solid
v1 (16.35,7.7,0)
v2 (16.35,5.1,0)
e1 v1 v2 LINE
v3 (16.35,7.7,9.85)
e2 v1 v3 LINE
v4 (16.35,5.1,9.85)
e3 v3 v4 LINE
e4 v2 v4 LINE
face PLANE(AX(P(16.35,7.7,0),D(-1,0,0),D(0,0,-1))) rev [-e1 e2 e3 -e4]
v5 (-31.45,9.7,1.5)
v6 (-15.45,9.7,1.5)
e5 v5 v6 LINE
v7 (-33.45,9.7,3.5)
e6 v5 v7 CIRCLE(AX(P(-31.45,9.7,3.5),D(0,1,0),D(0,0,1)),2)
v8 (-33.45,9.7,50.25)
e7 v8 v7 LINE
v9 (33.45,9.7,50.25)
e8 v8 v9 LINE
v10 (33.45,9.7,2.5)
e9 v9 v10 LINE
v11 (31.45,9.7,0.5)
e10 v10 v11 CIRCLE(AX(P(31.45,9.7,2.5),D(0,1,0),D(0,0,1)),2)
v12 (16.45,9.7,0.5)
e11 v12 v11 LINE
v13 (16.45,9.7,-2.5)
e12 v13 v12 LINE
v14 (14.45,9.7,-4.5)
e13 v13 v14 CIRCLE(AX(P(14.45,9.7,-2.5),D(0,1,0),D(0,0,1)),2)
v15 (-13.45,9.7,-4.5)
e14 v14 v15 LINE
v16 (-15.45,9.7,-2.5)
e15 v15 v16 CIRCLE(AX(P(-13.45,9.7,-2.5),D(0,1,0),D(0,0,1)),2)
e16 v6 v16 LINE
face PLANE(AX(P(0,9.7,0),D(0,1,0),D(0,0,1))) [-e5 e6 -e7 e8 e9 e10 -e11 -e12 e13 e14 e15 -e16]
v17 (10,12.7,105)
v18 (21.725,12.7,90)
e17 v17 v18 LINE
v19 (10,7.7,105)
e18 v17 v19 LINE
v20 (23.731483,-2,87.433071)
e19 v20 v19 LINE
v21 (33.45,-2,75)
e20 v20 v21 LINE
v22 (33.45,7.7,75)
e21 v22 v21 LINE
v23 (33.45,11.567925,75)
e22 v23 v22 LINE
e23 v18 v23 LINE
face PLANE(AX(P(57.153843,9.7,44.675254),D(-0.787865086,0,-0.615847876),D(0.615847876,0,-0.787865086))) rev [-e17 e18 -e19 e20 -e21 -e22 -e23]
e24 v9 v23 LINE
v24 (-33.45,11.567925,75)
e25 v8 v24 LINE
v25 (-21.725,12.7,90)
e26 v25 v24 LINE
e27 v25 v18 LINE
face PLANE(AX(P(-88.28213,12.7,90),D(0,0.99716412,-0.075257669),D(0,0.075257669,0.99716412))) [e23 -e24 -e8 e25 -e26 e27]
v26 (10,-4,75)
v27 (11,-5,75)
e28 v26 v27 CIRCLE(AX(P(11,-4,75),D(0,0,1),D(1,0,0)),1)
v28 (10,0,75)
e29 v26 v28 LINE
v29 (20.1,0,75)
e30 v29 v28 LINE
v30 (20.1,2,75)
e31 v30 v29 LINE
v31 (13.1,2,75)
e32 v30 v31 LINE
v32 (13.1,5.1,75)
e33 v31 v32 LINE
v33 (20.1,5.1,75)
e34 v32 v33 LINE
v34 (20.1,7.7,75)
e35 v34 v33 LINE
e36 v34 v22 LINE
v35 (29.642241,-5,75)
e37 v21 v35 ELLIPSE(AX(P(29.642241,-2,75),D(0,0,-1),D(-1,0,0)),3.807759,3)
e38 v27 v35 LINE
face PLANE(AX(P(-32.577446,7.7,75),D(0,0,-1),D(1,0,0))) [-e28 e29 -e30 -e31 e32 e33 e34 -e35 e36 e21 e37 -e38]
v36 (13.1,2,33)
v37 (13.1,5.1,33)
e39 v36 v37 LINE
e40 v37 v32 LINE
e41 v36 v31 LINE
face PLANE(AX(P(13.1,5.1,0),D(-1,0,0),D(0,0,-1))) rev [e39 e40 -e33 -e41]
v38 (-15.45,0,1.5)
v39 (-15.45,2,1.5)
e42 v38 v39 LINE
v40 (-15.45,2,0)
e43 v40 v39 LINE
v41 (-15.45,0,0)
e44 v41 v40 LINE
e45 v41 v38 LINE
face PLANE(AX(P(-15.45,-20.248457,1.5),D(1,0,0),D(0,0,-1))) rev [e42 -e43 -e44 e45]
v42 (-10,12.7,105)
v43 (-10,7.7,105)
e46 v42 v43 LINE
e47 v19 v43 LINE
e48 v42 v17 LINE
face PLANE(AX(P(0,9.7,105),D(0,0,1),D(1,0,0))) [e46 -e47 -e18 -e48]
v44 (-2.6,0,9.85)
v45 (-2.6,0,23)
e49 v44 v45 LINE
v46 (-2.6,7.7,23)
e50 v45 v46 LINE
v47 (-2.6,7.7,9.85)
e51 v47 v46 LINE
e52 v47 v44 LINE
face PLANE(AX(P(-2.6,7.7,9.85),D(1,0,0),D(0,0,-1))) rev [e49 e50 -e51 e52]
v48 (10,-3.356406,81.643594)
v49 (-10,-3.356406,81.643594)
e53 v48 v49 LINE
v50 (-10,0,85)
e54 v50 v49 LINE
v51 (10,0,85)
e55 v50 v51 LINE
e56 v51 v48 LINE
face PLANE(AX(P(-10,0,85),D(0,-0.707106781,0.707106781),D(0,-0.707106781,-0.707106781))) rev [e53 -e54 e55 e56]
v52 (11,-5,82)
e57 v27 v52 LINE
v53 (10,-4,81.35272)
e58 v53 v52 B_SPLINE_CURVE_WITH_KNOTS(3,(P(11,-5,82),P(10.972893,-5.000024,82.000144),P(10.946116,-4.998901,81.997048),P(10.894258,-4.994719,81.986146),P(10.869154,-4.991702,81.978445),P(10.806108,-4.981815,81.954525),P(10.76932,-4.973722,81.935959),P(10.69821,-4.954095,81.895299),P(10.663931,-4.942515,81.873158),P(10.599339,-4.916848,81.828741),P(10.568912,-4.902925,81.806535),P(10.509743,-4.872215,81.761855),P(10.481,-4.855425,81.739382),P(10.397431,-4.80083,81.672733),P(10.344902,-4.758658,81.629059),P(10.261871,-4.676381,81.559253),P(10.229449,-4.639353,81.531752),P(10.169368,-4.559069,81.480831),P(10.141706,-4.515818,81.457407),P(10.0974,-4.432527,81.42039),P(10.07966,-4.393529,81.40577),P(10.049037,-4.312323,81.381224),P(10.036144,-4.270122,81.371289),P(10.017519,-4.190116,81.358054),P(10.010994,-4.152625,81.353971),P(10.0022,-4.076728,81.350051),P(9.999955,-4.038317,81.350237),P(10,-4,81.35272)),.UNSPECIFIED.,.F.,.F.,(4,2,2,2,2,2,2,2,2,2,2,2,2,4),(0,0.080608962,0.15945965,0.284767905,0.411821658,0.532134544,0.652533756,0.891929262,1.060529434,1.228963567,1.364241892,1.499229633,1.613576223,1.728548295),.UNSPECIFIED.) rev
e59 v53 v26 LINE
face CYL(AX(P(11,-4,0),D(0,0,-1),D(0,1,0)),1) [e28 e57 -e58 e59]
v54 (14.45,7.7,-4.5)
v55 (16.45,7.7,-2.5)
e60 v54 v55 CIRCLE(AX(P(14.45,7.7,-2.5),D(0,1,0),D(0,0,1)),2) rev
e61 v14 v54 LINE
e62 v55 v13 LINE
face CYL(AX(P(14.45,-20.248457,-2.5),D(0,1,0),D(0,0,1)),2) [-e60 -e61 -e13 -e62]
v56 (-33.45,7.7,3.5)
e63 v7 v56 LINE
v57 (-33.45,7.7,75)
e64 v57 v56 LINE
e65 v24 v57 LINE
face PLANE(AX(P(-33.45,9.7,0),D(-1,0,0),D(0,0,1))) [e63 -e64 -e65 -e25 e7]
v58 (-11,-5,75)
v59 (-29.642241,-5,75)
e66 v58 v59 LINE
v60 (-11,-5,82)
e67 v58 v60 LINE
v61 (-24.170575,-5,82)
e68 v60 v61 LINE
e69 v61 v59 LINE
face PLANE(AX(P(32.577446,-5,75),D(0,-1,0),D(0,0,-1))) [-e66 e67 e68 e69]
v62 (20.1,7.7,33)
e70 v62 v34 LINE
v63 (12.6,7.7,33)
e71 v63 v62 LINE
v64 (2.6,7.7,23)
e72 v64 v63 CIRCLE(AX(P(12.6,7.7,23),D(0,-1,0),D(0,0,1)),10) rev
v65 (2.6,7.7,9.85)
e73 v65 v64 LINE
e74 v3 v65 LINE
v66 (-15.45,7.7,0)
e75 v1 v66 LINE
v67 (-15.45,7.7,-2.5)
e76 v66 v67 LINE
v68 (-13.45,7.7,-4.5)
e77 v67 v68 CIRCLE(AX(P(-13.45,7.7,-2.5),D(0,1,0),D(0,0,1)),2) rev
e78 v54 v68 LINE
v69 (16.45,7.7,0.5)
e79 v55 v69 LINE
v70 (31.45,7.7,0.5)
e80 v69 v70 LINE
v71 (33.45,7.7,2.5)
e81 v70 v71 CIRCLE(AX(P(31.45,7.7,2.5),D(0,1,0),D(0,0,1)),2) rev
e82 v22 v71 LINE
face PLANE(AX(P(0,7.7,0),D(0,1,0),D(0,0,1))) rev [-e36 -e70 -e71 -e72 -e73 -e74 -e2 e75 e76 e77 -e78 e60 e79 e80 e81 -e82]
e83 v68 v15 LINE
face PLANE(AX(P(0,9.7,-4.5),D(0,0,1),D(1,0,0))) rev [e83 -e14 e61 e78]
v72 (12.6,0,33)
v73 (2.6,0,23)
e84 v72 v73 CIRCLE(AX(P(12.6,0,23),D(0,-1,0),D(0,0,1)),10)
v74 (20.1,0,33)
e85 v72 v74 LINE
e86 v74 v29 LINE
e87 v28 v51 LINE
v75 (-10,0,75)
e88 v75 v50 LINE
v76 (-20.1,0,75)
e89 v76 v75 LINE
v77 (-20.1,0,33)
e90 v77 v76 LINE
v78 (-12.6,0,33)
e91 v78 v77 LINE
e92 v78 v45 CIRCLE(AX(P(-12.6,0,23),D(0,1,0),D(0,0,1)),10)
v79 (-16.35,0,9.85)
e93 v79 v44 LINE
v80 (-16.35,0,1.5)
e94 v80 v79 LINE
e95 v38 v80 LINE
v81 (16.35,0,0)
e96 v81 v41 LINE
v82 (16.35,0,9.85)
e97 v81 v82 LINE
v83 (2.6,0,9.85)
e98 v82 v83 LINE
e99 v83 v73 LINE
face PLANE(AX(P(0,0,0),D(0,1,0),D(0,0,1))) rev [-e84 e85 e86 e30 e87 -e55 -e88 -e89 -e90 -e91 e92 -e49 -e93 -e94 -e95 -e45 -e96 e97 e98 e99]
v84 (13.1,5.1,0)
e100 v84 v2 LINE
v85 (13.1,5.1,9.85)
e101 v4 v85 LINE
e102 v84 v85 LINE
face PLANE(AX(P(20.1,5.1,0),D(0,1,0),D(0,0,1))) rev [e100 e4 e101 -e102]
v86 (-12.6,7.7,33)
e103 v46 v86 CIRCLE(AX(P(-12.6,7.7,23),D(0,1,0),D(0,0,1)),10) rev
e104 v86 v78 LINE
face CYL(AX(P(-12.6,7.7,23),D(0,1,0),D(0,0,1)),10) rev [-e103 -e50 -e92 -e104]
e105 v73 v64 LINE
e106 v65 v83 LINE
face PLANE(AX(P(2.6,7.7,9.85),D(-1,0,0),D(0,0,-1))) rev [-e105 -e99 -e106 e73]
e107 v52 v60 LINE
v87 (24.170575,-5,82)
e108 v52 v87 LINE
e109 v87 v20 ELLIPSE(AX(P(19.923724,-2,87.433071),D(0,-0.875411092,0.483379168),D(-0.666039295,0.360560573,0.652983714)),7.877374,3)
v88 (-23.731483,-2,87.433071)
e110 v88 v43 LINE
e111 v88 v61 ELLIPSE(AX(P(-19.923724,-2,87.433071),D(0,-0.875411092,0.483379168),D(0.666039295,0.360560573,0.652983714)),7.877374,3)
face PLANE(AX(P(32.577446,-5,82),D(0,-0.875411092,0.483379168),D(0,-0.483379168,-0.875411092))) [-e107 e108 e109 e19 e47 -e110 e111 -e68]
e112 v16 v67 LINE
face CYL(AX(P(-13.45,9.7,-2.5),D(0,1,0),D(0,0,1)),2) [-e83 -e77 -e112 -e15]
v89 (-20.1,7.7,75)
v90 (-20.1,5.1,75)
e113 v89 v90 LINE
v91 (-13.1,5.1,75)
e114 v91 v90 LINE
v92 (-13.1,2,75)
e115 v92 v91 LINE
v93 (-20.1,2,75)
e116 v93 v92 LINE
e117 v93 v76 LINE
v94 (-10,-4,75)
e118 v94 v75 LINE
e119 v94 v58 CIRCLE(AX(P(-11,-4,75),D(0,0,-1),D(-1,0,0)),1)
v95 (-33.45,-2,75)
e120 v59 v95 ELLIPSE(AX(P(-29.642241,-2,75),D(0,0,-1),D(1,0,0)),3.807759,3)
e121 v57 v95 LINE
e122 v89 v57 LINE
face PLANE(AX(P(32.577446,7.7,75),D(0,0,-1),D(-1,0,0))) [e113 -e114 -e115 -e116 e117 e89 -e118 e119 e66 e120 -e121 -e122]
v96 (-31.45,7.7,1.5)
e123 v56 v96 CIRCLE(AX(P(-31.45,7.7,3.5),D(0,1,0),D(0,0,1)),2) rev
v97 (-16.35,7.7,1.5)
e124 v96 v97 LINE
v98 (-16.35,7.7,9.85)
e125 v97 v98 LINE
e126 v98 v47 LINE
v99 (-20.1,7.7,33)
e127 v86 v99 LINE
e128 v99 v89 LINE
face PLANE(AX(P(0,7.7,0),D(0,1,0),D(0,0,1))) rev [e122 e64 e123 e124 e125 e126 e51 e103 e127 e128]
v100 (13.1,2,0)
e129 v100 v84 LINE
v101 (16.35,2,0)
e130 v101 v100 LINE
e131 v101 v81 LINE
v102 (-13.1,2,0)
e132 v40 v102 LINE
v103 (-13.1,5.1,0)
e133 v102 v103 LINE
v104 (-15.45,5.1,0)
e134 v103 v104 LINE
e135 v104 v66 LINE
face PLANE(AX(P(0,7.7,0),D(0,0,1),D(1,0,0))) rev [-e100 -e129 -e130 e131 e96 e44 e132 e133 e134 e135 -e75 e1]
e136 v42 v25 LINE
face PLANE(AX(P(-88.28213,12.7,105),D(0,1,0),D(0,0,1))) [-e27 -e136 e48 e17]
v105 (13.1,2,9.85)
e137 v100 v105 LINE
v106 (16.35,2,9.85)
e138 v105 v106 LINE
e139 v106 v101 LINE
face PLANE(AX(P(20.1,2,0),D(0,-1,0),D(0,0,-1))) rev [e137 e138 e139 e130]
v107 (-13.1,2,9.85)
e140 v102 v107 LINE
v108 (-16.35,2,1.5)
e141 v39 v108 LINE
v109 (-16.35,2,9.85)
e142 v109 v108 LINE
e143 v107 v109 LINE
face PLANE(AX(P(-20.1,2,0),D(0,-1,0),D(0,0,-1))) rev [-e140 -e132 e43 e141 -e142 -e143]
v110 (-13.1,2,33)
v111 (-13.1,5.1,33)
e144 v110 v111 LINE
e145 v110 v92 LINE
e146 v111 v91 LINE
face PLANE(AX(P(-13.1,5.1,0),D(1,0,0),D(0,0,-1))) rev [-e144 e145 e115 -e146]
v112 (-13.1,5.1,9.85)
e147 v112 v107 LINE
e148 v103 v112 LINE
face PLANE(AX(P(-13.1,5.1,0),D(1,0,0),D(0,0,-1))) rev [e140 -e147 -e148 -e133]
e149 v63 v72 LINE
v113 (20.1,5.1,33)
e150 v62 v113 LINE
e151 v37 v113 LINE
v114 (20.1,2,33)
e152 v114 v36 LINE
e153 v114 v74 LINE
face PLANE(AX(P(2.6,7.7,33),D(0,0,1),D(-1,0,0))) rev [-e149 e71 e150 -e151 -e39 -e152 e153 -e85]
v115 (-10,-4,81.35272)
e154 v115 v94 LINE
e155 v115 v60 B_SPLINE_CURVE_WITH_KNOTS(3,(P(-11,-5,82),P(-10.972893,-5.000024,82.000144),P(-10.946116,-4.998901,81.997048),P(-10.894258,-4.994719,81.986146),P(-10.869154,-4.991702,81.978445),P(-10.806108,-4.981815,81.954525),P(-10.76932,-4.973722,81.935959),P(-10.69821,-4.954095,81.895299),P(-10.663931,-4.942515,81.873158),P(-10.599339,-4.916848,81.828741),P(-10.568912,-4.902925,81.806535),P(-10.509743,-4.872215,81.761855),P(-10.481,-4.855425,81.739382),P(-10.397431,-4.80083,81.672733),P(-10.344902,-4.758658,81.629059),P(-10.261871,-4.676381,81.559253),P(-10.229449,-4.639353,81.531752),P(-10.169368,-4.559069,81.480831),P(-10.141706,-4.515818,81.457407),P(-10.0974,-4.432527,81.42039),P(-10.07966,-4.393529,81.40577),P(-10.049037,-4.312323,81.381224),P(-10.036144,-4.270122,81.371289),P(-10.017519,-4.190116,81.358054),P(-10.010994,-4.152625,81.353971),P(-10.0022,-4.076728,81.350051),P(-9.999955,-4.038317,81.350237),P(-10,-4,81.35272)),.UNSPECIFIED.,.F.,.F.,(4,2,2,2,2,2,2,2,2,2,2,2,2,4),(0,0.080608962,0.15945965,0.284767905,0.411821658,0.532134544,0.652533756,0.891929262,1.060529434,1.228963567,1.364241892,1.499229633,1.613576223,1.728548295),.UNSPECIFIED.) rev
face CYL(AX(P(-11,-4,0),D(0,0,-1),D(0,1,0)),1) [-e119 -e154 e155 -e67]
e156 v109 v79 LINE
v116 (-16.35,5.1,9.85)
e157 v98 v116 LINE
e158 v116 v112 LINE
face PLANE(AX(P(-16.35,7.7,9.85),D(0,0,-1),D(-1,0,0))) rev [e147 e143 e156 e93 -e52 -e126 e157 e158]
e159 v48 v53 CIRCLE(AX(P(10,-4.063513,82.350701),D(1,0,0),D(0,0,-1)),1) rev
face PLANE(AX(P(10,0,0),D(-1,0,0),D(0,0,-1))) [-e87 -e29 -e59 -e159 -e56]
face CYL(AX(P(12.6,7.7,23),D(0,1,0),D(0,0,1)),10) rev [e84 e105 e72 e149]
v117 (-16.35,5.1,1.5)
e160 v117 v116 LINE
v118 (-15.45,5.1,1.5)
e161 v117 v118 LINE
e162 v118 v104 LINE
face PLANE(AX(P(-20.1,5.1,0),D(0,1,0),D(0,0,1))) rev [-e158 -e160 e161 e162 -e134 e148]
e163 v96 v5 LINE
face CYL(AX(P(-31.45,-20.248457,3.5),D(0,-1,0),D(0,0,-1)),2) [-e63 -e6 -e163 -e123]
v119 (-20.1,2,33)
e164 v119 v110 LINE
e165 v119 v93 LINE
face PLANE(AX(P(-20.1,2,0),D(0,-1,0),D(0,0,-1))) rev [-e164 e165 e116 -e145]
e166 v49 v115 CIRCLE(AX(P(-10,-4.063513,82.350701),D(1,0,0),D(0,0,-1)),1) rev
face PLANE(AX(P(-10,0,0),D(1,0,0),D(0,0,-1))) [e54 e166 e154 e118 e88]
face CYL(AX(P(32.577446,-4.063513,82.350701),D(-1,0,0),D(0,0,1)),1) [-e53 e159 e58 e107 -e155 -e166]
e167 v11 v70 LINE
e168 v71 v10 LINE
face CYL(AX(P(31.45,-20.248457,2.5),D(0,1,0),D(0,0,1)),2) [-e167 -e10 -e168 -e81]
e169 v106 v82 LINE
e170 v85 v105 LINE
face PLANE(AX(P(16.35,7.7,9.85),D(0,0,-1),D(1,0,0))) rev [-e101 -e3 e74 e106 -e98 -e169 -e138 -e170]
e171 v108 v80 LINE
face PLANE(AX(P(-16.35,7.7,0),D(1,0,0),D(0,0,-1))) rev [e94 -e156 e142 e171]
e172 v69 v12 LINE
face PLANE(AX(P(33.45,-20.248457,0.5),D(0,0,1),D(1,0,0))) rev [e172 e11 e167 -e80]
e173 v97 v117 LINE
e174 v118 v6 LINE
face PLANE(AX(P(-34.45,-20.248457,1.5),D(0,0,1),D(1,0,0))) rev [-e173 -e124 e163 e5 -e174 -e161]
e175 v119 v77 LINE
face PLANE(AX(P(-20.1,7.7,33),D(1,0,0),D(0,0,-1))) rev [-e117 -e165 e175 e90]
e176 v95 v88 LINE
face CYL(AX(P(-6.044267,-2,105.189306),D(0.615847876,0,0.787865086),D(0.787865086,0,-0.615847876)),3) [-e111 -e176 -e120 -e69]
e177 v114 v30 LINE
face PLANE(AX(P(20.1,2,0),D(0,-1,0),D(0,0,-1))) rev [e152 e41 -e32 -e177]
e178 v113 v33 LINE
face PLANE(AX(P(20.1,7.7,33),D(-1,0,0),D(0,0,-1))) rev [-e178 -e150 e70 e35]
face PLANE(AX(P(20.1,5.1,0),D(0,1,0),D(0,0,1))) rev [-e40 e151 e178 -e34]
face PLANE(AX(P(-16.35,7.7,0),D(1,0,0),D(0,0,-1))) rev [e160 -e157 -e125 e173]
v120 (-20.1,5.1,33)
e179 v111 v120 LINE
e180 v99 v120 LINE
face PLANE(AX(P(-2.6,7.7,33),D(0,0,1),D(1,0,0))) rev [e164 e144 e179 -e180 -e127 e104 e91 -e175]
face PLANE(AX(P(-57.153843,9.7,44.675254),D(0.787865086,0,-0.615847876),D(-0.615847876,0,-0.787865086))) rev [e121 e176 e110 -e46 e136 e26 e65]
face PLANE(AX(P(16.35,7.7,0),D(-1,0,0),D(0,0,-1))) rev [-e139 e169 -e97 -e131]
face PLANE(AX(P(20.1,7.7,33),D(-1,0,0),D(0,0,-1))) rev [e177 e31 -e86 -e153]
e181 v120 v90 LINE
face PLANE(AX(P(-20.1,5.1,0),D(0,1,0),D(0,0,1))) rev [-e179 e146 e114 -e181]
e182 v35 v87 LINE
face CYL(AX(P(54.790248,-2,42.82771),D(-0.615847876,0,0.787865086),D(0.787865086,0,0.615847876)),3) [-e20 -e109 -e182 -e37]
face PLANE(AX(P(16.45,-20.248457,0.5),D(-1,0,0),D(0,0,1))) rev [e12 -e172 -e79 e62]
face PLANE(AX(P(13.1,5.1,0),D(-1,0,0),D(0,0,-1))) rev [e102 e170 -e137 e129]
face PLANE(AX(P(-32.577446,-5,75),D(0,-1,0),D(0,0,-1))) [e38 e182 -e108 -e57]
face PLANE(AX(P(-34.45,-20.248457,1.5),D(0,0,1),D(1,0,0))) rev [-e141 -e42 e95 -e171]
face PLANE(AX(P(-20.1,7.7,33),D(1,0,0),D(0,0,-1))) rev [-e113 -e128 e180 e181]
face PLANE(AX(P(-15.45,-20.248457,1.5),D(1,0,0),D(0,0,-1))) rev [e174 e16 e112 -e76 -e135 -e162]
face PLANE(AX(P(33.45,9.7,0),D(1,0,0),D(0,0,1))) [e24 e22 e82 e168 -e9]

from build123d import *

# Parameters (mm, degrees)
BOSS_EXTRUDE1_DEPTH     = 7.7
SKETCH2_W               = 7
SKETCH2_H               = 3.1
CUT_EXTRUDE1_DEPTH      = 79.027559234
FILLET1_R               = 10
BOSS_EXTRUDE2_DEPTH     = 2
BOSS_EXTRUDE3_DEPTH     = 33.45
BOSS_EXTRUDE4_REACH     = 112.929
CUT_EXTRUDE2_DEPTH      = 111.928772192
CUT_EXTRUDE2_DEPTH_BACK = 111.928772192
CUT_EXTRUDE3_DEPTH      = 10
FILLET3_R               = 1
FILLET5_R               = 3
CUT_EXTRUDE4_REACH      = 113.176
SKETCH8_W               = 17
SKETCH8_H               = 5
SKETCH8_W_2             = 19
SKETCH8_H_2             = 7
FILLET6_R               = 2
FILLET7_R               = 2


with BuildPart() as part:
    # Sketch1 → Boss-Extrude1 (new body)
    with BuildSketch(Plane(origin=(0, 0, 0), x_dir=(1, 0, 0), z_dir=(0, 1, 0))):
        Polygon((0, 0), (-16.35, 0), (-16.35, -9.85), (-2.6, -9.85), (-2.6, -33), (-20.1, -33), (-20.1, -75), (0, -75), align=None)
    extrude(amount=BOSS_EXTRUDE1_DEPTH)

    # Sketch2 → Cut-Extrude1 (cut, through all)
    with BuildSketch(Plane.XY.offset(75)):
        with Locations((-16.6, 3.55)):
            Rectangle(SKETCH2_W, SKETCH2_H)
    extrude(amount=-CUT_EXTRUDE1_DEPTH, mode=Mode.SUBTRACT)

    # Fillet1
    fillet1_edges = [part.edges().sort_by_distance(p)[0] for p in [
        (-2.6, 3.85, 33),
    ]]
    fillet(fillet1_edges, radius=FILLET1_R)

    # Sketch3 → Boss-Extrude2 (add)
    with BuildSketch(Plane(origin=(0, 7.7, 0), x_dir=(1, 0, 0), z_dir=(0, 1, 0))):
        Polygon((0, 4.5), (-33.45, 4.5), (-33.45, -75), (-10, -105), (0, -105), align=None)
    extrude(amount=BOSS_EXTRUDE2_DEPTH)

    # Sketch4 → Boss-Extrude3 (add)
    with BuildSketch(Plane(origin=(0, 0, 0), x_dir=(0, 0, -1), z_dir=(1, 0, 0))):
        Polygon((-105, 9.7), (-105, 12.7), (-90, 12.7), (-50.25, 9.7), align=None)
    extrude(amount=-BOSS_EXTRUDE3_DEPTH)

    # Boss-Extrude4: up to this face of the body (flat: up to its plane)
    boss_extrude4_end = Plane(part.part.faces().sort_by_distance((0, 5.848980441, 46.191947566))[0])
    # Sketch5 → Boss-Extrude4 (add, up to the picked face)
    with BuildSketch(Plane.ZY.offset(33.45), mode=Mode.PRIVATE) as boss_extrude4_sk1:
        Polygon((75, 7.7), (75, -5), (82, -5), (105, 7.7), align=None)
    boss_extrude4_tool1 = split(extrude(boss_extrude4_sk1.sketch, amount=-BOSS_EXTRUDE4_REACH, mode=Mode.PRIVATE), bisect_by=boss_extrude4_end, keep=Keep.BOTH, mode=Mode.PRIVATE)
    add(boss_extrude4_tool1.solids().sort_by(Axis((-33.45, 2.665766, 85.441441), (1, 0, 0)))[0])

    # Sketch6 → Cut-Extrude2 (cut, two sides: drawn at the far end of the back side and taken through both)
    with BuildSketch(Plane(origin=(0, 7.7, 0), x_dir=(1, 0, 0), z_dir=(0, 1, 0)).offset(-CUT_EXTRUDE2_DEPTH_BACK)):
        Polygon((-33.45, -75), (-10, -105), (-33.45, -105), align=None)
    extrude(amount=CUT_EXTRUDE2_DEPTH + CUT_EXTRUDE2_DEPTH_BACK, mode=Mode.SUBTRACT)

    # Sketch7 → Cut-Extrude3 (cut)
    with BuildSketch(Plane(origin=(0, 0, 0), x_dir=(0, 0, -1), z_dir=(1, 0, 0))):
        Polygon((-75, 0), (-85, 0), (-80, -5), (-75, -5), align=None)
    extrude(amount=-CUT_EXTRUDE3_DEPTH, mode=Mode.SUBTRACT)

    # Fillet3
    # the kernel refuses this fillet: 1 mm, written as the material it takes off along each edge
    with BuildSketch(Plane(origin=(5.810983209, -5, 80), x_dir=(0, 0, 1), z_dir=(-1, 0, 0))) as fillet3_piece_1:
        with BuildLine():
            CenterArc((2.350701034, 0.936487472), FILLET3_R, 135, 114.469800521)
            Line((1.643594253, 1.643594253), (1.629452117, 1.657736389))
            Line((1.629452117, 1.657736389), (-0.014142136, 0.014142136))
            Line((-0.014142136, 0.014142136), (0, -0.02))
            ThreePointArc((0, -0.02), (1, -0.02), (1.992985979, -0.018729749))
            Line((1.992985979, -0.018729749), (2, 0))
        make_face()
    extrude(amount=15.810983209, mode=Mode.SUBTRACT)
    with BuildSketch(Plane(origin=(-10, -5, 82.5), x_dir=(-1, 0, 0), z_dir=(0, 0, -1))) as fillet3_piece_2_section:
        with BuildLine():
            CenterArc((FILLET3_R, FILLET3_R), FILLET3_R, 180, 90)
            Line((0, FILLET3_R), (-FILLET3_R * 0.02, FILLET3_R))
            Line((-FILLET3_R * 0.02, FILLET3_R), (-FILLET3_R * 0.02, -FILLET3_R * 0.02))
            Line((-FILLET3_R * 0.02, -FILLET3_R * 0.02), (FILLET3_R, -FILLET3_R * 0.02))
            Line((FILLET3_R, -FILLET3_R * 0.02), (FILLET3_R, 0))
        make_face()
    fillet3_piece_2 = extrude(amount=10, mode=Mode.PRIVATE)
    fillet3_piece_2 = split(fillet3_piece_2, bisect_by=Plane(origin=(-10.222841489, -6.700692184, 78.299307816), z_dir=(0, 0.7071067811865466, -0.7071067811865485)), keep=Keep.TOP, mode=Mode.PRIVATE)
    add(fillet3_piece_2, mode=Mode.SUBTRACT)
    with BuildSketch(Plane(origin=(5.810983209, -5, 80), x_dir=(0, 0, 1), z_dir=(-1, 0, 0))) as fillet3_piece_3a_section:
        with BuildLine():
            CenterArc((2.350701034, 0.936487472), FILLET3_R, 135, 114.469800521)
            Line((1.643594253, 1.643594253), (1.629452117, 1.657736389))
            Line((1.629452117, 1.657736389), (-0.014142136, 0.014142136))
            Line((-0.014142136, 0.014142136), (0, -0.02))
            ThreePointArc((0, -0.02), (1, -0.02), (1.992985979, -0.018729749))
            Line((1.992985979, -0.018729749), (2, 0))
        make_face()
    fillet3_piece_3a = extrude(amount=21.621966417, mode=Mode.PRIVATE)
    fillet3_piece_3a = split(fillet3_piece_3a, bisect_by=Plane(origin=(-10, -4.567151235, 80.996776665), z_dir=(-1, 0, 0)), keep=Keep.TOP, mode=Mode.PRIVATE)
    with BuildSketch(Plane(origin=(-10, -5, 82.5), x_dir=(-1, 0, 0), z_dir=(0, 0, -1))) as fillet3_piece_3b_section:
        with BuildLine():
            CenterArc((FILLET3_R, FILLET3_R), FILLET3_R, 180, 90)
            Line((0, FILLET3_R), (-FILLET3_R * 0.02, FILLET3_R))
            Line((-FILLET3_R * 0.02, FILLET3_R), (-FILLET3_R * 0.02, -FILLET3_R * 0.02))
            Line((-FILLET3_R * 0.02, -FILLET3_R * 0.02), (FILLET3_R, -FILLET3_R * 0.02))
            Line((FILLET3_R, -FILLET3_R * 0.02), (FILLET3_R, 0))
        make_face()
    fillet3_piece_3b = extrude(amount=10, mode=Mode.PRIVATE)
    fillet3_piece_3b = split(fillet3_piece_3b, bisect_by=Plane(origin=(-10.238471404, -4.220535034, 80.779464966), z_dir=(0, -0.7071067811865466, 0.7071067811865485)), keep=Keep.TOP, mode=Mode.PRIVATE)
    fillet3_piece_3 = fillet3_piece_3a & fillet3_piece_3b
    add(fillet3_piece_3, mode=Mode.SUBTRACT)

    # Mirror1: part across plane


with BuildPart() as part_1:
    add(part.part)
    add(part.part.mirror(Plane(origin=(0, 7.7, 75), x_dir=(0, 0, 1), z_dir=(-1, 0, 0))))

    # Fillet5
    # the kernel refuses this fillet: 3 mm, written as the material it takes off along each edge
    with BuildSketch(Plane(origin=(-38.068859068, -5, 69.091011854), x_dir=(0, 1, 0), z_dir=(0.6158478756904763, 0, 0.7878650861711843)), Plane(origin=(38.068859068, -5, 69.091011854), x_dir=(-0.7878650861711843, 0, -0.6158478756904764), z_dir=(-0.6158478756904763, 0, 0.7878650861711843))) as fillet5_piece_1:
        with BuildLine():
            CenterArc((FILLET5_R, -FILLET5_R), FILLET5_R, 90, 90)
            Line((0, -FILLET5_R), (0, 0))
            Line((0, 0), (FILLET5_R, 0))
        make_face()
    extrude(amount=23.884769896, mode=Mode.SUBTRACT)

    # Cut-Extrude4: up to this face of the body (flat: up to its plane)
    cut_extrude4_end = Plane(part_1.part.faces().sort_by_distance((0, 0, 47.459676899))[0])
    # Sketch8 → Cut-Extrude4 (cut, up to the picked face)
    with BuildSketch(Plane(origin=(0, 9.7, 0), x_dir=(1, 0, 0), z_dir=(0, 1, 0)), mode=Mode.PRIVATE) as cut_extrude4_sk1:
        with Locations((24.95, 2)):
            Rectangle(SKETCH8_W, SKETCH8_H)
    cut_extrude4_tool1 = split(extrude(cut_extrude4_sk1.sketch, amount=-CUT_EXTRUDE4_REACH, mode=Mode.PRIVATE), bisect_by=cut_extrude4_end, keep=Keep.BOTH, mode=Mode.PRIVATE)
    # Sketch8 → Cut-Extrude4 (cut, up to the picked face)
    with BuildSketch(Plane(origin=(0, 9.7, 0), x_dir=(1, 0, 0), z_dir=(0, 1, 0)), mode=Mode.PRIVATE) as cut_extrude4_sk2:
        with Locations((-24.95, 2)):
            Rectangle(SKETCH8_W_2, SKETCH8_H_2)
    cut_extrude4_tool2 = split(extrude(cut_extrude4_sk2.sketch, amount=-CUT_EXTRUDE4_REACH, mode=Mode.PRIVATE), bisect_by=cut_extrude4_end, keep=Keep.BOTH, mode=Mode.PRIVATE)
    add(cut_extrude4_tool1.solids().sort_by(Axis((24.95, 9.7, -2), (0, -1, 0)))[0], mode=Mode.SUBTRACT)
    add(cut_extrude4_tool2.solids().sort_by(Axis((-24.95, 9.7, -2), (0, -1, 0)))[0], mode=Mode.SUBTRACT)

    # Fillet6
    fillet6_edges = [part_1.edges().sort_by_distance(p)[0] for p in [
        (-15.45, 8.7, -4.5),
        (-33.45, 8.7, 1.5),
    ]]
    fillet(fillet6_edges, radius=FILLET6_R)

    # Fillet7
    fillet7_edges = [part_1.edges().sort_by_distance(p)[0] for p in [
        (33.45, 8.7, 0.5),
        (16.45, 8.7, -4.5),
    ]]
    fillet(fillet7_edges, radius=FILLET7_R)


solid = part_1.part
